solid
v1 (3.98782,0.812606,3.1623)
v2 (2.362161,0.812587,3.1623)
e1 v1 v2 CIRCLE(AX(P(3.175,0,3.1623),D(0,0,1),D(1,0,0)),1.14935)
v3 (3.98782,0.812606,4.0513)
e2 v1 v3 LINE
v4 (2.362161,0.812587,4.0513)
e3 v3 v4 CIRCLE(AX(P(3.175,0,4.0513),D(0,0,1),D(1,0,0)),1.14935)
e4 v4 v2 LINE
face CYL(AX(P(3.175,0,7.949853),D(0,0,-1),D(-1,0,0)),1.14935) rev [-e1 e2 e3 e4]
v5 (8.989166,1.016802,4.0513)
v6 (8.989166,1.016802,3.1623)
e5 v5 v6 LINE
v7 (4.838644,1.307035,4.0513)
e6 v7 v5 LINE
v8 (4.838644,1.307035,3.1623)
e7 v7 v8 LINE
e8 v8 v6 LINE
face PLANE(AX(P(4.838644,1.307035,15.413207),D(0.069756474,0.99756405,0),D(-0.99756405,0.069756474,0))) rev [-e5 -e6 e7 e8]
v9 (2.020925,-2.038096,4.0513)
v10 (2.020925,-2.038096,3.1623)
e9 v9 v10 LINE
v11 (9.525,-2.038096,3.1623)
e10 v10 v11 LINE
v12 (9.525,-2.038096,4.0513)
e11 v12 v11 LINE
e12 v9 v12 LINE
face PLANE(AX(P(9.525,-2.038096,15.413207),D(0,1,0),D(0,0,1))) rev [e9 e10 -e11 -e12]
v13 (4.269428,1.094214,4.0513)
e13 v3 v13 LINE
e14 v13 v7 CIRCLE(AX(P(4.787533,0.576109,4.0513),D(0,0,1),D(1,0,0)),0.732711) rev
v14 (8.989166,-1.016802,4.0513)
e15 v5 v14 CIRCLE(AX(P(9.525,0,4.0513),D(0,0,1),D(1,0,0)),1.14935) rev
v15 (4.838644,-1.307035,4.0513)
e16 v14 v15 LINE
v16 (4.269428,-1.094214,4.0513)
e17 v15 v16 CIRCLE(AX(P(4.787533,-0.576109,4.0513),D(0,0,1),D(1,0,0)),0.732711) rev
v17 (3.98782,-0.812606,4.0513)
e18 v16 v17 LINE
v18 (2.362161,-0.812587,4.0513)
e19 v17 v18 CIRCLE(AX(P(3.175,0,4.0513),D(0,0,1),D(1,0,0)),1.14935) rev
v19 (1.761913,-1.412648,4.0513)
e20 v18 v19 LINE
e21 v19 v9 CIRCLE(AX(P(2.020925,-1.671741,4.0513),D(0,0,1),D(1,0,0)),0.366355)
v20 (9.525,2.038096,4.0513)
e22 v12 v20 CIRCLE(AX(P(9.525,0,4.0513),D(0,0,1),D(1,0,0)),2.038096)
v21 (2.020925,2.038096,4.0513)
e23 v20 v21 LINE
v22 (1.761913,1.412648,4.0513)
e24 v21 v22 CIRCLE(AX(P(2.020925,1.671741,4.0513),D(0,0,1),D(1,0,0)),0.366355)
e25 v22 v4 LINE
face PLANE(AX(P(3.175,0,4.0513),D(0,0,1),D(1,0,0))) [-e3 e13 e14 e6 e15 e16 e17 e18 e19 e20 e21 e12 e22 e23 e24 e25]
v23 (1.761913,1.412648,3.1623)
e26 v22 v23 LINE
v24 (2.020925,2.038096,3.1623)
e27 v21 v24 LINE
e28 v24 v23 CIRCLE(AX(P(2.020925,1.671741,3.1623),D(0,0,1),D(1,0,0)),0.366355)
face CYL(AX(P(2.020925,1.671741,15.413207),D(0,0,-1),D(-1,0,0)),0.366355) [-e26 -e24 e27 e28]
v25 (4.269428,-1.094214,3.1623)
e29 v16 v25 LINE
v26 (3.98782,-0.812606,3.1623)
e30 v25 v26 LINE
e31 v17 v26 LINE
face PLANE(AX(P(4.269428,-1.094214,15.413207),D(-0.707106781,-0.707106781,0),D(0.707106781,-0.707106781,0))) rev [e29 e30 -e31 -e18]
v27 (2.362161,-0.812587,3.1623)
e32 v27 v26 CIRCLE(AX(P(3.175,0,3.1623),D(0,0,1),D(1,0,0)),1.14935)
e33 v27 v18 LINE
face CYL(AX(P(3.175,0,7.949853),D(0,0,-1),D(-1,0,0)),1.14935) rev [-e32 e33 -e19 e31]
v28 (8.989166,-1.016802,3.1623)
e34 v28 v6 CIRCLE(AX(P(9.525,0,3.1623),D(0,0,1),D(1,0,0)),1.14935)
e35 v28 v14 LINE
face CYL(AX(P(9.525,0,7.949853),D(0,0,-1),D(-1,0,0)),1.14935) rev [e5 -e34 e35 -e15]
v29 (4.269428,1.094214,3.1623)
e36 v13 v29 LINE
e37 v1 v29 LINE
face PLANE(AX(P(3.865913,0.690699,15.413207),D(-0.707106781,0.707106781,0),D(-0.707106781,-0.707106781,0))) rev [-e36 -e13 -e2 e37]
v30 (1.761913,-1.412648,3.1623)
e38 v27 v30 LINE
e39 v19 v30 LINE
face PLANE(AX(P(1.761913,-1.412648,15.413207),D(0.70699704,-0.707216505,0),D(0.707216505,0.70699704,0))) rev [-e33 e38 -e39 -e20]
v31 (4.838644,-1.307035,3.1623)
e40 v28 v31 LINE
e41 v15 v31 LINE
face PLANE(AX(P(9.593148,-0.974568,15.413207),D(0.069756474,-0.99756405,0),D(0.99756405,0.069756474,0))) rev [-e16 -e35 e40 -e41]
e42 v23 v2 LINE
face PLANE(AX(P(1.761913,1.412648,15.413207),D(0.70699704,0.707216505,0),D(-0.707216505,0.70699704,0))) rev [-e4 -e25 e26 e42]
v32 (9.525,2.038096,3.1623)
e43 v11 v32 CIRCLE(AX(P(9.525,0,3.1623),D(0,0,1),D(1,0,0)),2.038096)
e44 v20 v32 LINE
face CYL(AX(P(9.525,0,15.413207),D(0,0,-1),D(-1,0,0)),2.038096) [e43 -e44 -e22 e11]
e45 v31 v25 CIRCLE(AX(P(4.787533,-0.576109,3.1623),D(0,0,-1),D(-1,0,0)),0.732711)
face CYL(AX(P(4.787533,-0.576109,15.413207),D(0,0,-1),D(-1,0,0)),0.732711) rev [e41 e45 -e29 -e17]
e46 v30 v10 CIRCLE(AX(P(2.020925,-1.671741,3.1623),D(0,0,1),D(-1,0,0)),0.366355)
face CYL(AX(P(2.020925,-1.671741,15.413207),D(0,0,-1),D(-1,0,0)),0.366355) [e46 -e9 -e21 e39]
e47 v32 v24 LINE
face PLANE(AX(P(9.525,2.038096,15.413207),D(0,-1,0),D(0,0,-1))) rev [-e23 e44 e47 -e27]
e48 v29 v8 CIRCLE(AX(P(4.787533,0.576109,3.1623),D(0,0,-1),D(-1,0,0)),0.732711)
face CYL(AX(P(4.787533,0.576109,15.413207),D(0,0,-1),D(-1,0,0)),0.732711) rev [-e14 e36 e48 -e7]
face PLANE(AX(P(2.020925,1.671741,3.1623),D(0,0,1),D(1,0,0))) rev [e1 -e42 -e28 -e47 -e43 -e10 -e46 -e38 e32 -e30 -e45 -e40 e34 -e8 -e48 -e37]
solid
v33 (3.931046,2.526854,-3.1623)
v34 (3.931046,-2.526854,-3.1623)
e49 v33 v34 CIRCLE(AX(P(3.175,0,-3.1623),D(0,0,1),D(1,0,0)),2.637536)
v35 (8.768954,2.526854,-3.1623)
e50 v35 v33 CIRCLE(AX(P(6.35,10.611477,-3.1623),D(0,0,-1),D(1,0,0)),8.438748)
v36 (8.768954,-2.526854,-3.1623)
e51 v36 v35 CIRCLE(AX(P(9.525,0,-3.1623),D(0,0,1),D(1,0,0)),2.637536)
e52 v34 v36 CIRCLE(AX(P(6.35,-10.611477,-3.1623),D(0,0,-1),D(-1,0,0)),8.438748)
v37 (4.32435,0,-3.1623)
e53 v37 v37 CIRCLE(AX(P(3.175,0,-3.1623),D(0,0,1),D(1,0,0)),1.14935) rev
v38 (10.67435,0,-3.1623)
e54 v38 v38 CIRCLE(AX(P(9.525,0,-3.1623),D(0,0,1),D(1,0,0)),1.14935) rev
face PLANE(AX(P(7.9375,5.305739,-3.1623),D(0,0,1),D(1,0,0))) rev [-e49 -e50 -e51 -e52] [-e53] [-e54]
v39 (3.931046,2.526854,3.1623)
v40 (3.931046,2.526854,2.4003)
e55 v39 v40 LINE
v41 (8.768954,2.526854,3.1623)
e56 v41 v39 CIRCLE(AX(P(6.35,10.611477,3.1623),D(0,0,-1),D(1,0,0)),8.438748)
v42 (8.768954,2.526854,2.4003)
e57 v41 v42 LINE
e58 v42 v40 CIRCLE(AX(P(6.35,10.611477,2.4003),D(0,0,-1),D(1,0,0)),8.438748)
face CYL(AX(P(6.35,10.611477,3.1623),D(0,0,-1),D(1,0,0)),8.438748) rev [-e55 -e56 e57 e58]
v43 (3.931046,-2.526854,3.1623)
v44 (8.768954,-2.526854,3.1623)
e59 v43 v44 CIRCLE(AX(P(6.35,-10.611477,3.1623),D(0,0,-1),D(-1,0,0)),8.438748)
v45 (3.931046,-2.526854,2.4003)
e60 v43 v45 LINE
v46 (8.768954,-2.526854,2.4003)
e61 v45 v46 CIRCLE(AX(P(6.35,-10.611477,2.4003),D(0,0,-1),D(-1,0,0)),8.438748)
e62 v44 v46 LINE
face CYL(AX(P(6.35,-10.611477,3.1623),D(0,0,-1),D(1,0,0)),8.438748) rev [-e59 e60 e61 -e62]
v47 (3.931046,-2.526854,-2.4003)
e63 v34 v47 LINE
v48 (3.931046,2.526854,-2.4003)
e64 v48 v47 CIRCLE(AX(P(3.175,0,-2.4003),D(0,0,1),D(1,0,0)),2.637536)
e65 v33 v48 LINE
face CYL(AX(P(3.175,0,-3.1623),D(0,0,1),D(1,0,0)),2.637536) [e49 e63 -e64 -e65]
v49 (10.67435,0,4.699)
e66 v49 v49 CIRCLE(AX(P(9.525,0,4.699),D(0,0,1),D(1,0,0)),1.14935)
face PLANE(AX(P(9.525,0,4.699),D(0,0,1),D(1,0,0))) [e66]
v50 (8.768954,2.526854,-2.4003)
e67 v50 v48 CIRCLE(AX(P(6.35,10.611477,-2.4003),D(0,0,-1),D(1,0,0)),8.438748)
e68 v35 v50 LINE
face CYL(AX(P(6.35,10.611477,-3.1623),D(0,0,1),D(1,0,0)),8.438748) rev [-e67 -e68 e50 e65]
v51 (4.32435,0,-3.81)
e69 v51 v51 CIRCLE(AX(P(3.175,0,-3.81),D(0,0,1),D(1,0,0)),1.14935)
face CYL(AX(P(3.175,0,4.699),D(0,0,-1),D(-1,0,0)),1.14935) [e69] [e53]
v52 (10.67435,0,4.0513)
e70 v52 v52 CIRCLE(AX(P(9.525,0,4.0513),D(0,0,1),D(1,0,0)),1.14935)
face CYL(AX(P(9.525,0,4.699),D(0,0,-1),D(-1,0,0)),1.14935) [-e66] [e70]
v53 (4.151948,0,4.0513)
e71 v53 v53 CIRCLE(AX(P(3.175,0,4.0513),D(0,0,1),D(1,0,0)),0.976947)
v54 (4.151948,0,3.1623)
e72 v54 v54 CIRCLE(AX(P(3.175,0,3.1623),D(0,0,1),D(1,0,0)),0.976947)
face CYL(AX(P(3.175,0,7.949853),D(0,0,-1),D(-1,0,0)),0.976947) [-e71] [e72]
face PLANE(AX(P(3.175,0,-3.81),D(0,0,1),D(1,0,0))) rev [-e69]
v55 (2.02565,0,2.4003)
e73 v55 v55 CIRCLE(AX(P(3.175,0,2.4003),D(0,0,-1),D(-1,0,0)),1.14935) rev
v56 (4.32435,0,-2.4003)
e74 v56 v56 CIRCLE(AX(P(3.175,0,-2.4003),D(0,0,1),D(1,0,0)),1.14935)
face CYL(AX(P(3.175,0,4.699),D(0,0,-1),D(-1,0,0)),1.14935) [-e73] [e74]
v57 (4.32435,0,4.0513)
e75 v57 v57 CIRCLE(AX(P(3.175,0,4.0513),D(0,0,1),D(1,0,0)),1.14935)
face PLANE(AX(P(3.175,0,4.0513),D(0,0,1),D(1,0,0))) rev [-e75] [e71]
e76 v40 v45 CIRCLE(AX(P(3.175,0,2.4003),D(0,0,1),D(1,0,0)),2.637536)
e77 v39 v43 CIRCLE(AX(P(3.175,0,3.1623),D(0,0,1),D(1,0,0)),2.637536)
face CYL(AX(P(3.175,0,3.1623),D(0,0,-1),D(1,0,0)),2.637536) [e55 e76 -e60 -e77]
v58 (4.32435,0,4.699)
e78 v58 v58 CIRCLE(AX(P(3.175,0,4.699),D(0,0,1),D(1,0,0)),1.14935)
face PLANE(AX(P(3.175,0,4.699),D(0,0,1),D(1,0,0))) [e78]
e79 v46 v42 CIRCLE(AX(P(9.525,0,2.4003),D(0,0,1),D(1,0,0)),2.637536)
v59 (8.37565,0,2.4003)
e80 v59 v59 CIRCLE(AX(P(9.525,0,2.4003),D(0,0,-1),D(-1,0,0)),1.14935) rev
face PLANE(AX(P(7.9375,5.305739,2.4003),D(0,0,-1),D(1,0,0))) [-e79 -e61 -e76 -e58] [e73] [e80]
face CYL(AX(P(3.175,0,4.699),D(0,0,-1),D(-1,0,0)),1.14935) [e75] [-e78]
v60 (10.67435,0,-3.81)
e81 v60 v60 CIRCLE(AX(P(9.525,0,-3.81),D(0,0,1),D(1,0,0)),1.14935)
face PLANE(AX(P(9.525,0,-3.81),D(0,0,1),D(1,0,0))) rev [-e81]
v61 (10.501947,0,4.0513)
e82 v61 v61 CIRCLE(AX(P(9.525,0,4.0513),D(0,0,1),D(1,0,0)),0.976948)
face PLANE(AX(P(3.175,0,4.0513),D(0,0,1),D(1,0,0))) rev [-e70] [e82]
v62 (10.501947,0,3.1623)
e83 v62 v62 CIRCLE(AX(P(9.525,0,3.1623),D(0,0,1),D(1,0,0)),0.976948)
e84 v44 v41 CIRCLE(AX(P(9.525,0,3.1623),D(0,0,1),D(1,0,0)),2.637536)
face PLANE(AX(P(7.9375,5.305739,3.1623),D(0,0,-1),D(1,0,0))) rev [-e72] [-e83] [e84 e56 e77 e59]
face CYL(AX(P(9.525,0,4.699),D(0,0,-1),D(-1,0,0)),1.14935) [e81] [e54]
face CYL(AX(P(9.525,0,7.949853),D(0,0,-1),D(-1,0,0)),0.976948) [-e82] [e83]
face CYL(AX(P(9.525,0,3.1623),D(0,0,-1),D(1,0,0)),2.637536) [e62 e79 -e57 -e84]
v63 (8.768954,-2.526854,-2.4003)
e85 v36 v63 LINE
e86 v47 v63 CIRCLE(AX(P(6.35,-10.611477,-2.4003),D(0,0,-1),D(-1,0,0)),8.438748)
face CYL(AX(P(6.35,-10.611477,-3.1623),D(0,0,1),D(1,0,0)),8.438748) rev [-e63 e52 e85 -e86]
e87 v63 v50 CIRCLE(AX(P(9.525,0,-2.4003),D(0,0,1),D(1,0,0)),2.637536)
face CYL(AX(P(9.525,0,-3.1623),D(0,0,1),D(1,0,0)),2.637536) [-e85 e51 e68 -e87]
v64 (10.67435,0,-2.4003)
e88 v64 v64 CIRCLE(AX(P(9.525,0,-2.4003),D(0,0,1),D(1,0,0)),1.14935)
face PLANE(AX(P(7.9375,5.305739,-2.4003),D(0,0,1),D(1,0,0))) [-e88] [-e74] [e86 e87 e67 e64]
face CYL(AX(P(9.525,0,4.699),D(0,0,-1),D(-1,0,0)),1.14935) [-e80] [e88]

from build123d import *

# Parameters (mm, degrees)
SKETCH4_R                  = 1.651
SKETCH4_R_2                = 1.17475
BOSS_EXTRUDE1_DEPTH        = 1.5875
SKETCH5_R                  = 1.14935
BOSS_EXTRUDE2_DEPTH        = 0.762
LPATTERN1_COUNT            = 2
LPATTERN1_PITCH            = 6.35
SKETCH7_R                  = 1.14935
BOSS_EXTRUDE3_DEPTH        = 0.762
MIRROR1_START              = 2.4003
MIRROR1_OUTLINE_R          = 1.14935
MIRROR1_DEPTH              = 0.762
BOSS_EXTRUDE4_DEPTH        = 4.699
BOSS_EXTRUDE4_DEPTH_BACK   = 3.81
SKETCH8_R                  = 1.14935
BOSS_EXTRUDE4_2_DEPTH      = 4.699
BOSS_EXTRUDE4_2_DEPTH_BACK = 3.81
BOSS_EXTRUDE5_DEPTH        = 0.889
SKETCH12_R                 = 1.14935
SKETCH12_R_2               = 0.9769475
CUT_EXTRUDE1_DEPTH         = 0.889


# Read off the part's stored shape, not the designer's step: Mirror1
with BuildPart() as part:
    # Sketch4 → Boss-Extrude1 (new, symmetric)
    with BuildSketch(Plane.XY):
        with Locations((3.175, 0)):
            Circle(SKETCH4_R)
        with Locations((3.175, 0)):
            Circle(SKETCH4_R_2, mode=Mode.SUBTRACT)
    extrude(amount=BOSS_EXTRUDE1_DEPTH, both=True)


with BuildPart() as body_2:
    # Sketch5 → Boss-Extrude2 (new body)
    with BuildSketch(Plane.XY.offset(1.5875)):
        with BuildLine():
            ThreePointArc((-2.342877482, 2.879371452), (-6.1722, 0), (-2.342877482, -2.879371452))
            ThreePointArc((-2.342877482, -2.879371452), (0, -2.54762), (2.342877482, -2.879371452))
            ThreePointArc((2.342877482, -2.879371452), (6.1722, 0), (2.342877482, 2.879371452))
            ThreePointArc((2.342877482, 2.879371452), (0, 2.54762), (-2.342877482, 2.879371452))
        make_face()
        with Locations(Location((-3.175, 0, 0), (0, 0, 180))):
            Circle(SKETCH5_R, mode=Mode.SUBTRACT)
        with Locations(Location((3.175, 0, 0), (0, 0, 180))):
            Circle(SKETCH5_R, mode=Mode.SUBTRACT)
    extrude(amount=BOSS_EXTRUDE2_DEPTH)


with BuildPart() as lpattern1_1:
    # LPattern1: pattern copy
    add(part.part.moved(Location(Vector(1, 0, 0) * (1 * LPATTERN1_PITCH))))


with BuildPart() as body_4:
    # Sketch7 → Boss-Extrude3 (new body)
    with BuildSketch(Plane.XY.offset(-2.4003)):
        with BuildLine():
            ThreePointArc((3.931045679, 2.526853989), (0.537464, 0), (3.931045679, -2.526853989))
            ThreePointArc((3.931045679, -2.526853989), (6.35, -2.17272892), (8.768954321, -2.526853989))
            ThreePointArc((8.768954321, -2.526853989), (12.162536, 0), (8.768954321, 2.526853989))
            ThreePointArc((8.768954321, 2.526853989), (6.35, 2.17272892), (3.931045679, 2.526853989))
        make_face()
        with Locations((3.175, 0)):
            Circle(SKETCH7_R, mode=Mode.SUBTRACT)
        with Locations((9.525, 0)):
            Circle(SKETCH7_R, mode=Mode.SUBTRACT)
    extrude(amount=-BOSS_EXTRUDE3_DEPTH)


with BuildPart() as body_5:
    # Mirror1 outline → Mirror1 (new body)
    with BuildSketch(Plane.XY.offset(MIRROR1_START)):
        with BuildLine():
            ThreePointArc((8.768954321, -2.526853989), (12.162536, 0), (8.768954321, 2.526853989))
            ThreePointArc((8.768954321, 2.526853989), (6.35, 2.17272892), (3.931045679, 2.526853989))
            ThreePointArc((3.931045679, 2.526853989), (0.537464, 0), (3.931045679, -2.526853989))
            ThreePointArc((3.931045679, -2.526853989), (6.35, -2.17272892), (8.768954321, -2.526853989))
        make_face()
        with Locations((3.175, 0)):
            Circle(MIRROR1_OUTLINE_R, mode=Mode.SUBTRACT)
        with Locations((9.525, 0)):
            Circle(MIRROR1_OUTLINE_R, mode=Mode.SUBTRACT)
    extrude(amount=MIRROR1_DEPTH)


with BuildPart() as body_3:
    # Sketch8 → Boss-Extrude4 (new, two sides: drawn at the far end of the back side and taken through both)
    with BuildSketch(Plane.XY.offset(-BOSS_EXTRUDE4_DEPTH_BACK)):
        with Locations((3.175, 0)):
            Circle(SKETCH8_R)
    extrude(amount=BOSS_EXTRUDE4_DEPTH + BOSS_EXTRUDE4_DEPTH_BACK)


with BuildPart() as body_4_2:
    # Sketch8 → Boss-Extrude4 2 (new, two sides: drawn at the far end of the back side and taken through both)
    with BuildSketch(Plane.XY.offset(-BOSS_EXTRUDE4_2_DEPTH_BACK)):
        with Locations((9.525, 0)):
            Circle(SKETCH8_R)
    extrude(amount=BOSS_EXTRUDE4_2_DEPTH + BOSS_EXTRUDE4_2_DEPTH_BACK)


with BuildPart() as body_5_2:
    # Sketch10 → Boss-Extrude5 (new body)
    with BuildSketch(Plane.XY.offset(3.1623)):
        with BuildLine():
            Line((9.525, -2.038096), (2.020925445, -2.038096))
            ThreePointArc((2.020925445, -2.038096), (1.682446393, -1.811912533), (1.761913324, -1.412648164))
            Line((1.761913324, -1.412648164), (2.484086603, -0.690698991))
            ThreePointArc((2.484086603, -0.690698991), (3.175, -0.9769475), (3.865913397, -0.690698991))
            Line((3.865913397, -0.690698991), (4.269428301, -1.094213895))
            ThreePointArc((4.269428301, -1.094213895), (4.530932284, -1.262418909), (4.838644263, -1.307035023))
            Line((4.838644263, -1.307035023), (9.593148413, -0.974567705))
            ThreePointArc((9.593148413, -0.974567705), (10.5019475, 0), (9.593148413, 0.974567705))
            Line((9.593148413, 0.974567705), (4.838644263, 1.307035023))
            ThreePointArc((4.838644263, 1.307035023), (4.530932284, 1.262418909), (4.269428301, 1.094213895))
            Line((4.269428301, 1.094213895), (3.865913397, 0.690698991))
            ThreePointArc((3.865913397, 0.690698991), (3.175, 0.9769475), (2.484086603, 0.690698991))
            Line((2.484086603, 0.690698991), (1.761913324, 1.412648164))
            ThreePointArc((1.761913324, 1.412648164), (1.682446393, 1.811912533), (2.020925445, 2.038096))
            Line((2.020925445, 2.038096), (9.525, 2.038096))
            ThreePointArc((9.525, 2.038096), (11.563096, 0), (9.525, -2.038096))
        make_face()
    extrude(amount=BOSS_EXTRUDE5_DEPTH)


with BuildPart() as cut_extrude1_tool:
    # Sketch12 → Cut-Extrude1 (new body)
    # profile 1 of 2: a face of its own
    with BuildSketch(Plane.XY.offset(3.1623)):
        with Locations((3.175, 0)):
            Circle(SKETCH12_R)
        with Locations((3.175, 0)):
            Circle(SKETCH12_R_2, mode=Mode.SUBTRACT)
    # profile 2 of 2: a face of its own
    with BuildSketch(Plane.XY.offset(3.1623)):
        with Locations((9.525, 0)):
            Circle(SKETCH12_R)
        with Locations((9.525, 0)):
            Circle(SKETCH12_R_2, mode=Mode.SUBTRACT)
    extrude(amount=CUT_EXTRUDE1_DEPTH)


with BuildPart() as body_3_1:
    add(body_3.part)

    # Cut-Extrude1: cut by cut_extrude1_tool
    add(cut_extrude1_tool.part, mode=Mode.SUBTRACT)


with BuildPart() as body_4_2_1:
    add(body_4_2.part)

    # Cut-Extrude1: cut by cut_extrude1_tool
    add(cut_extrude1_tool.part, mode=Mode.SUBTRACT)


with BuildPart() as body_5_2_1:
    add(body_5_2.part)

    # Cut-Extrude1: cut by cut_extrude1_tool
    add(cut_extrude1_tool.part, mode=Mode.SUBTRACT)


with BuildPart() as body_4_1:
    add(body_4.part)

    # Combine3: union body 5, body 4 2, body 3
    add(body_5.part)
    add(body_4_2_1.part)
    add(body_3_1.part)


solid = Compound([body_5_2_1.part, body_4_1.part])
